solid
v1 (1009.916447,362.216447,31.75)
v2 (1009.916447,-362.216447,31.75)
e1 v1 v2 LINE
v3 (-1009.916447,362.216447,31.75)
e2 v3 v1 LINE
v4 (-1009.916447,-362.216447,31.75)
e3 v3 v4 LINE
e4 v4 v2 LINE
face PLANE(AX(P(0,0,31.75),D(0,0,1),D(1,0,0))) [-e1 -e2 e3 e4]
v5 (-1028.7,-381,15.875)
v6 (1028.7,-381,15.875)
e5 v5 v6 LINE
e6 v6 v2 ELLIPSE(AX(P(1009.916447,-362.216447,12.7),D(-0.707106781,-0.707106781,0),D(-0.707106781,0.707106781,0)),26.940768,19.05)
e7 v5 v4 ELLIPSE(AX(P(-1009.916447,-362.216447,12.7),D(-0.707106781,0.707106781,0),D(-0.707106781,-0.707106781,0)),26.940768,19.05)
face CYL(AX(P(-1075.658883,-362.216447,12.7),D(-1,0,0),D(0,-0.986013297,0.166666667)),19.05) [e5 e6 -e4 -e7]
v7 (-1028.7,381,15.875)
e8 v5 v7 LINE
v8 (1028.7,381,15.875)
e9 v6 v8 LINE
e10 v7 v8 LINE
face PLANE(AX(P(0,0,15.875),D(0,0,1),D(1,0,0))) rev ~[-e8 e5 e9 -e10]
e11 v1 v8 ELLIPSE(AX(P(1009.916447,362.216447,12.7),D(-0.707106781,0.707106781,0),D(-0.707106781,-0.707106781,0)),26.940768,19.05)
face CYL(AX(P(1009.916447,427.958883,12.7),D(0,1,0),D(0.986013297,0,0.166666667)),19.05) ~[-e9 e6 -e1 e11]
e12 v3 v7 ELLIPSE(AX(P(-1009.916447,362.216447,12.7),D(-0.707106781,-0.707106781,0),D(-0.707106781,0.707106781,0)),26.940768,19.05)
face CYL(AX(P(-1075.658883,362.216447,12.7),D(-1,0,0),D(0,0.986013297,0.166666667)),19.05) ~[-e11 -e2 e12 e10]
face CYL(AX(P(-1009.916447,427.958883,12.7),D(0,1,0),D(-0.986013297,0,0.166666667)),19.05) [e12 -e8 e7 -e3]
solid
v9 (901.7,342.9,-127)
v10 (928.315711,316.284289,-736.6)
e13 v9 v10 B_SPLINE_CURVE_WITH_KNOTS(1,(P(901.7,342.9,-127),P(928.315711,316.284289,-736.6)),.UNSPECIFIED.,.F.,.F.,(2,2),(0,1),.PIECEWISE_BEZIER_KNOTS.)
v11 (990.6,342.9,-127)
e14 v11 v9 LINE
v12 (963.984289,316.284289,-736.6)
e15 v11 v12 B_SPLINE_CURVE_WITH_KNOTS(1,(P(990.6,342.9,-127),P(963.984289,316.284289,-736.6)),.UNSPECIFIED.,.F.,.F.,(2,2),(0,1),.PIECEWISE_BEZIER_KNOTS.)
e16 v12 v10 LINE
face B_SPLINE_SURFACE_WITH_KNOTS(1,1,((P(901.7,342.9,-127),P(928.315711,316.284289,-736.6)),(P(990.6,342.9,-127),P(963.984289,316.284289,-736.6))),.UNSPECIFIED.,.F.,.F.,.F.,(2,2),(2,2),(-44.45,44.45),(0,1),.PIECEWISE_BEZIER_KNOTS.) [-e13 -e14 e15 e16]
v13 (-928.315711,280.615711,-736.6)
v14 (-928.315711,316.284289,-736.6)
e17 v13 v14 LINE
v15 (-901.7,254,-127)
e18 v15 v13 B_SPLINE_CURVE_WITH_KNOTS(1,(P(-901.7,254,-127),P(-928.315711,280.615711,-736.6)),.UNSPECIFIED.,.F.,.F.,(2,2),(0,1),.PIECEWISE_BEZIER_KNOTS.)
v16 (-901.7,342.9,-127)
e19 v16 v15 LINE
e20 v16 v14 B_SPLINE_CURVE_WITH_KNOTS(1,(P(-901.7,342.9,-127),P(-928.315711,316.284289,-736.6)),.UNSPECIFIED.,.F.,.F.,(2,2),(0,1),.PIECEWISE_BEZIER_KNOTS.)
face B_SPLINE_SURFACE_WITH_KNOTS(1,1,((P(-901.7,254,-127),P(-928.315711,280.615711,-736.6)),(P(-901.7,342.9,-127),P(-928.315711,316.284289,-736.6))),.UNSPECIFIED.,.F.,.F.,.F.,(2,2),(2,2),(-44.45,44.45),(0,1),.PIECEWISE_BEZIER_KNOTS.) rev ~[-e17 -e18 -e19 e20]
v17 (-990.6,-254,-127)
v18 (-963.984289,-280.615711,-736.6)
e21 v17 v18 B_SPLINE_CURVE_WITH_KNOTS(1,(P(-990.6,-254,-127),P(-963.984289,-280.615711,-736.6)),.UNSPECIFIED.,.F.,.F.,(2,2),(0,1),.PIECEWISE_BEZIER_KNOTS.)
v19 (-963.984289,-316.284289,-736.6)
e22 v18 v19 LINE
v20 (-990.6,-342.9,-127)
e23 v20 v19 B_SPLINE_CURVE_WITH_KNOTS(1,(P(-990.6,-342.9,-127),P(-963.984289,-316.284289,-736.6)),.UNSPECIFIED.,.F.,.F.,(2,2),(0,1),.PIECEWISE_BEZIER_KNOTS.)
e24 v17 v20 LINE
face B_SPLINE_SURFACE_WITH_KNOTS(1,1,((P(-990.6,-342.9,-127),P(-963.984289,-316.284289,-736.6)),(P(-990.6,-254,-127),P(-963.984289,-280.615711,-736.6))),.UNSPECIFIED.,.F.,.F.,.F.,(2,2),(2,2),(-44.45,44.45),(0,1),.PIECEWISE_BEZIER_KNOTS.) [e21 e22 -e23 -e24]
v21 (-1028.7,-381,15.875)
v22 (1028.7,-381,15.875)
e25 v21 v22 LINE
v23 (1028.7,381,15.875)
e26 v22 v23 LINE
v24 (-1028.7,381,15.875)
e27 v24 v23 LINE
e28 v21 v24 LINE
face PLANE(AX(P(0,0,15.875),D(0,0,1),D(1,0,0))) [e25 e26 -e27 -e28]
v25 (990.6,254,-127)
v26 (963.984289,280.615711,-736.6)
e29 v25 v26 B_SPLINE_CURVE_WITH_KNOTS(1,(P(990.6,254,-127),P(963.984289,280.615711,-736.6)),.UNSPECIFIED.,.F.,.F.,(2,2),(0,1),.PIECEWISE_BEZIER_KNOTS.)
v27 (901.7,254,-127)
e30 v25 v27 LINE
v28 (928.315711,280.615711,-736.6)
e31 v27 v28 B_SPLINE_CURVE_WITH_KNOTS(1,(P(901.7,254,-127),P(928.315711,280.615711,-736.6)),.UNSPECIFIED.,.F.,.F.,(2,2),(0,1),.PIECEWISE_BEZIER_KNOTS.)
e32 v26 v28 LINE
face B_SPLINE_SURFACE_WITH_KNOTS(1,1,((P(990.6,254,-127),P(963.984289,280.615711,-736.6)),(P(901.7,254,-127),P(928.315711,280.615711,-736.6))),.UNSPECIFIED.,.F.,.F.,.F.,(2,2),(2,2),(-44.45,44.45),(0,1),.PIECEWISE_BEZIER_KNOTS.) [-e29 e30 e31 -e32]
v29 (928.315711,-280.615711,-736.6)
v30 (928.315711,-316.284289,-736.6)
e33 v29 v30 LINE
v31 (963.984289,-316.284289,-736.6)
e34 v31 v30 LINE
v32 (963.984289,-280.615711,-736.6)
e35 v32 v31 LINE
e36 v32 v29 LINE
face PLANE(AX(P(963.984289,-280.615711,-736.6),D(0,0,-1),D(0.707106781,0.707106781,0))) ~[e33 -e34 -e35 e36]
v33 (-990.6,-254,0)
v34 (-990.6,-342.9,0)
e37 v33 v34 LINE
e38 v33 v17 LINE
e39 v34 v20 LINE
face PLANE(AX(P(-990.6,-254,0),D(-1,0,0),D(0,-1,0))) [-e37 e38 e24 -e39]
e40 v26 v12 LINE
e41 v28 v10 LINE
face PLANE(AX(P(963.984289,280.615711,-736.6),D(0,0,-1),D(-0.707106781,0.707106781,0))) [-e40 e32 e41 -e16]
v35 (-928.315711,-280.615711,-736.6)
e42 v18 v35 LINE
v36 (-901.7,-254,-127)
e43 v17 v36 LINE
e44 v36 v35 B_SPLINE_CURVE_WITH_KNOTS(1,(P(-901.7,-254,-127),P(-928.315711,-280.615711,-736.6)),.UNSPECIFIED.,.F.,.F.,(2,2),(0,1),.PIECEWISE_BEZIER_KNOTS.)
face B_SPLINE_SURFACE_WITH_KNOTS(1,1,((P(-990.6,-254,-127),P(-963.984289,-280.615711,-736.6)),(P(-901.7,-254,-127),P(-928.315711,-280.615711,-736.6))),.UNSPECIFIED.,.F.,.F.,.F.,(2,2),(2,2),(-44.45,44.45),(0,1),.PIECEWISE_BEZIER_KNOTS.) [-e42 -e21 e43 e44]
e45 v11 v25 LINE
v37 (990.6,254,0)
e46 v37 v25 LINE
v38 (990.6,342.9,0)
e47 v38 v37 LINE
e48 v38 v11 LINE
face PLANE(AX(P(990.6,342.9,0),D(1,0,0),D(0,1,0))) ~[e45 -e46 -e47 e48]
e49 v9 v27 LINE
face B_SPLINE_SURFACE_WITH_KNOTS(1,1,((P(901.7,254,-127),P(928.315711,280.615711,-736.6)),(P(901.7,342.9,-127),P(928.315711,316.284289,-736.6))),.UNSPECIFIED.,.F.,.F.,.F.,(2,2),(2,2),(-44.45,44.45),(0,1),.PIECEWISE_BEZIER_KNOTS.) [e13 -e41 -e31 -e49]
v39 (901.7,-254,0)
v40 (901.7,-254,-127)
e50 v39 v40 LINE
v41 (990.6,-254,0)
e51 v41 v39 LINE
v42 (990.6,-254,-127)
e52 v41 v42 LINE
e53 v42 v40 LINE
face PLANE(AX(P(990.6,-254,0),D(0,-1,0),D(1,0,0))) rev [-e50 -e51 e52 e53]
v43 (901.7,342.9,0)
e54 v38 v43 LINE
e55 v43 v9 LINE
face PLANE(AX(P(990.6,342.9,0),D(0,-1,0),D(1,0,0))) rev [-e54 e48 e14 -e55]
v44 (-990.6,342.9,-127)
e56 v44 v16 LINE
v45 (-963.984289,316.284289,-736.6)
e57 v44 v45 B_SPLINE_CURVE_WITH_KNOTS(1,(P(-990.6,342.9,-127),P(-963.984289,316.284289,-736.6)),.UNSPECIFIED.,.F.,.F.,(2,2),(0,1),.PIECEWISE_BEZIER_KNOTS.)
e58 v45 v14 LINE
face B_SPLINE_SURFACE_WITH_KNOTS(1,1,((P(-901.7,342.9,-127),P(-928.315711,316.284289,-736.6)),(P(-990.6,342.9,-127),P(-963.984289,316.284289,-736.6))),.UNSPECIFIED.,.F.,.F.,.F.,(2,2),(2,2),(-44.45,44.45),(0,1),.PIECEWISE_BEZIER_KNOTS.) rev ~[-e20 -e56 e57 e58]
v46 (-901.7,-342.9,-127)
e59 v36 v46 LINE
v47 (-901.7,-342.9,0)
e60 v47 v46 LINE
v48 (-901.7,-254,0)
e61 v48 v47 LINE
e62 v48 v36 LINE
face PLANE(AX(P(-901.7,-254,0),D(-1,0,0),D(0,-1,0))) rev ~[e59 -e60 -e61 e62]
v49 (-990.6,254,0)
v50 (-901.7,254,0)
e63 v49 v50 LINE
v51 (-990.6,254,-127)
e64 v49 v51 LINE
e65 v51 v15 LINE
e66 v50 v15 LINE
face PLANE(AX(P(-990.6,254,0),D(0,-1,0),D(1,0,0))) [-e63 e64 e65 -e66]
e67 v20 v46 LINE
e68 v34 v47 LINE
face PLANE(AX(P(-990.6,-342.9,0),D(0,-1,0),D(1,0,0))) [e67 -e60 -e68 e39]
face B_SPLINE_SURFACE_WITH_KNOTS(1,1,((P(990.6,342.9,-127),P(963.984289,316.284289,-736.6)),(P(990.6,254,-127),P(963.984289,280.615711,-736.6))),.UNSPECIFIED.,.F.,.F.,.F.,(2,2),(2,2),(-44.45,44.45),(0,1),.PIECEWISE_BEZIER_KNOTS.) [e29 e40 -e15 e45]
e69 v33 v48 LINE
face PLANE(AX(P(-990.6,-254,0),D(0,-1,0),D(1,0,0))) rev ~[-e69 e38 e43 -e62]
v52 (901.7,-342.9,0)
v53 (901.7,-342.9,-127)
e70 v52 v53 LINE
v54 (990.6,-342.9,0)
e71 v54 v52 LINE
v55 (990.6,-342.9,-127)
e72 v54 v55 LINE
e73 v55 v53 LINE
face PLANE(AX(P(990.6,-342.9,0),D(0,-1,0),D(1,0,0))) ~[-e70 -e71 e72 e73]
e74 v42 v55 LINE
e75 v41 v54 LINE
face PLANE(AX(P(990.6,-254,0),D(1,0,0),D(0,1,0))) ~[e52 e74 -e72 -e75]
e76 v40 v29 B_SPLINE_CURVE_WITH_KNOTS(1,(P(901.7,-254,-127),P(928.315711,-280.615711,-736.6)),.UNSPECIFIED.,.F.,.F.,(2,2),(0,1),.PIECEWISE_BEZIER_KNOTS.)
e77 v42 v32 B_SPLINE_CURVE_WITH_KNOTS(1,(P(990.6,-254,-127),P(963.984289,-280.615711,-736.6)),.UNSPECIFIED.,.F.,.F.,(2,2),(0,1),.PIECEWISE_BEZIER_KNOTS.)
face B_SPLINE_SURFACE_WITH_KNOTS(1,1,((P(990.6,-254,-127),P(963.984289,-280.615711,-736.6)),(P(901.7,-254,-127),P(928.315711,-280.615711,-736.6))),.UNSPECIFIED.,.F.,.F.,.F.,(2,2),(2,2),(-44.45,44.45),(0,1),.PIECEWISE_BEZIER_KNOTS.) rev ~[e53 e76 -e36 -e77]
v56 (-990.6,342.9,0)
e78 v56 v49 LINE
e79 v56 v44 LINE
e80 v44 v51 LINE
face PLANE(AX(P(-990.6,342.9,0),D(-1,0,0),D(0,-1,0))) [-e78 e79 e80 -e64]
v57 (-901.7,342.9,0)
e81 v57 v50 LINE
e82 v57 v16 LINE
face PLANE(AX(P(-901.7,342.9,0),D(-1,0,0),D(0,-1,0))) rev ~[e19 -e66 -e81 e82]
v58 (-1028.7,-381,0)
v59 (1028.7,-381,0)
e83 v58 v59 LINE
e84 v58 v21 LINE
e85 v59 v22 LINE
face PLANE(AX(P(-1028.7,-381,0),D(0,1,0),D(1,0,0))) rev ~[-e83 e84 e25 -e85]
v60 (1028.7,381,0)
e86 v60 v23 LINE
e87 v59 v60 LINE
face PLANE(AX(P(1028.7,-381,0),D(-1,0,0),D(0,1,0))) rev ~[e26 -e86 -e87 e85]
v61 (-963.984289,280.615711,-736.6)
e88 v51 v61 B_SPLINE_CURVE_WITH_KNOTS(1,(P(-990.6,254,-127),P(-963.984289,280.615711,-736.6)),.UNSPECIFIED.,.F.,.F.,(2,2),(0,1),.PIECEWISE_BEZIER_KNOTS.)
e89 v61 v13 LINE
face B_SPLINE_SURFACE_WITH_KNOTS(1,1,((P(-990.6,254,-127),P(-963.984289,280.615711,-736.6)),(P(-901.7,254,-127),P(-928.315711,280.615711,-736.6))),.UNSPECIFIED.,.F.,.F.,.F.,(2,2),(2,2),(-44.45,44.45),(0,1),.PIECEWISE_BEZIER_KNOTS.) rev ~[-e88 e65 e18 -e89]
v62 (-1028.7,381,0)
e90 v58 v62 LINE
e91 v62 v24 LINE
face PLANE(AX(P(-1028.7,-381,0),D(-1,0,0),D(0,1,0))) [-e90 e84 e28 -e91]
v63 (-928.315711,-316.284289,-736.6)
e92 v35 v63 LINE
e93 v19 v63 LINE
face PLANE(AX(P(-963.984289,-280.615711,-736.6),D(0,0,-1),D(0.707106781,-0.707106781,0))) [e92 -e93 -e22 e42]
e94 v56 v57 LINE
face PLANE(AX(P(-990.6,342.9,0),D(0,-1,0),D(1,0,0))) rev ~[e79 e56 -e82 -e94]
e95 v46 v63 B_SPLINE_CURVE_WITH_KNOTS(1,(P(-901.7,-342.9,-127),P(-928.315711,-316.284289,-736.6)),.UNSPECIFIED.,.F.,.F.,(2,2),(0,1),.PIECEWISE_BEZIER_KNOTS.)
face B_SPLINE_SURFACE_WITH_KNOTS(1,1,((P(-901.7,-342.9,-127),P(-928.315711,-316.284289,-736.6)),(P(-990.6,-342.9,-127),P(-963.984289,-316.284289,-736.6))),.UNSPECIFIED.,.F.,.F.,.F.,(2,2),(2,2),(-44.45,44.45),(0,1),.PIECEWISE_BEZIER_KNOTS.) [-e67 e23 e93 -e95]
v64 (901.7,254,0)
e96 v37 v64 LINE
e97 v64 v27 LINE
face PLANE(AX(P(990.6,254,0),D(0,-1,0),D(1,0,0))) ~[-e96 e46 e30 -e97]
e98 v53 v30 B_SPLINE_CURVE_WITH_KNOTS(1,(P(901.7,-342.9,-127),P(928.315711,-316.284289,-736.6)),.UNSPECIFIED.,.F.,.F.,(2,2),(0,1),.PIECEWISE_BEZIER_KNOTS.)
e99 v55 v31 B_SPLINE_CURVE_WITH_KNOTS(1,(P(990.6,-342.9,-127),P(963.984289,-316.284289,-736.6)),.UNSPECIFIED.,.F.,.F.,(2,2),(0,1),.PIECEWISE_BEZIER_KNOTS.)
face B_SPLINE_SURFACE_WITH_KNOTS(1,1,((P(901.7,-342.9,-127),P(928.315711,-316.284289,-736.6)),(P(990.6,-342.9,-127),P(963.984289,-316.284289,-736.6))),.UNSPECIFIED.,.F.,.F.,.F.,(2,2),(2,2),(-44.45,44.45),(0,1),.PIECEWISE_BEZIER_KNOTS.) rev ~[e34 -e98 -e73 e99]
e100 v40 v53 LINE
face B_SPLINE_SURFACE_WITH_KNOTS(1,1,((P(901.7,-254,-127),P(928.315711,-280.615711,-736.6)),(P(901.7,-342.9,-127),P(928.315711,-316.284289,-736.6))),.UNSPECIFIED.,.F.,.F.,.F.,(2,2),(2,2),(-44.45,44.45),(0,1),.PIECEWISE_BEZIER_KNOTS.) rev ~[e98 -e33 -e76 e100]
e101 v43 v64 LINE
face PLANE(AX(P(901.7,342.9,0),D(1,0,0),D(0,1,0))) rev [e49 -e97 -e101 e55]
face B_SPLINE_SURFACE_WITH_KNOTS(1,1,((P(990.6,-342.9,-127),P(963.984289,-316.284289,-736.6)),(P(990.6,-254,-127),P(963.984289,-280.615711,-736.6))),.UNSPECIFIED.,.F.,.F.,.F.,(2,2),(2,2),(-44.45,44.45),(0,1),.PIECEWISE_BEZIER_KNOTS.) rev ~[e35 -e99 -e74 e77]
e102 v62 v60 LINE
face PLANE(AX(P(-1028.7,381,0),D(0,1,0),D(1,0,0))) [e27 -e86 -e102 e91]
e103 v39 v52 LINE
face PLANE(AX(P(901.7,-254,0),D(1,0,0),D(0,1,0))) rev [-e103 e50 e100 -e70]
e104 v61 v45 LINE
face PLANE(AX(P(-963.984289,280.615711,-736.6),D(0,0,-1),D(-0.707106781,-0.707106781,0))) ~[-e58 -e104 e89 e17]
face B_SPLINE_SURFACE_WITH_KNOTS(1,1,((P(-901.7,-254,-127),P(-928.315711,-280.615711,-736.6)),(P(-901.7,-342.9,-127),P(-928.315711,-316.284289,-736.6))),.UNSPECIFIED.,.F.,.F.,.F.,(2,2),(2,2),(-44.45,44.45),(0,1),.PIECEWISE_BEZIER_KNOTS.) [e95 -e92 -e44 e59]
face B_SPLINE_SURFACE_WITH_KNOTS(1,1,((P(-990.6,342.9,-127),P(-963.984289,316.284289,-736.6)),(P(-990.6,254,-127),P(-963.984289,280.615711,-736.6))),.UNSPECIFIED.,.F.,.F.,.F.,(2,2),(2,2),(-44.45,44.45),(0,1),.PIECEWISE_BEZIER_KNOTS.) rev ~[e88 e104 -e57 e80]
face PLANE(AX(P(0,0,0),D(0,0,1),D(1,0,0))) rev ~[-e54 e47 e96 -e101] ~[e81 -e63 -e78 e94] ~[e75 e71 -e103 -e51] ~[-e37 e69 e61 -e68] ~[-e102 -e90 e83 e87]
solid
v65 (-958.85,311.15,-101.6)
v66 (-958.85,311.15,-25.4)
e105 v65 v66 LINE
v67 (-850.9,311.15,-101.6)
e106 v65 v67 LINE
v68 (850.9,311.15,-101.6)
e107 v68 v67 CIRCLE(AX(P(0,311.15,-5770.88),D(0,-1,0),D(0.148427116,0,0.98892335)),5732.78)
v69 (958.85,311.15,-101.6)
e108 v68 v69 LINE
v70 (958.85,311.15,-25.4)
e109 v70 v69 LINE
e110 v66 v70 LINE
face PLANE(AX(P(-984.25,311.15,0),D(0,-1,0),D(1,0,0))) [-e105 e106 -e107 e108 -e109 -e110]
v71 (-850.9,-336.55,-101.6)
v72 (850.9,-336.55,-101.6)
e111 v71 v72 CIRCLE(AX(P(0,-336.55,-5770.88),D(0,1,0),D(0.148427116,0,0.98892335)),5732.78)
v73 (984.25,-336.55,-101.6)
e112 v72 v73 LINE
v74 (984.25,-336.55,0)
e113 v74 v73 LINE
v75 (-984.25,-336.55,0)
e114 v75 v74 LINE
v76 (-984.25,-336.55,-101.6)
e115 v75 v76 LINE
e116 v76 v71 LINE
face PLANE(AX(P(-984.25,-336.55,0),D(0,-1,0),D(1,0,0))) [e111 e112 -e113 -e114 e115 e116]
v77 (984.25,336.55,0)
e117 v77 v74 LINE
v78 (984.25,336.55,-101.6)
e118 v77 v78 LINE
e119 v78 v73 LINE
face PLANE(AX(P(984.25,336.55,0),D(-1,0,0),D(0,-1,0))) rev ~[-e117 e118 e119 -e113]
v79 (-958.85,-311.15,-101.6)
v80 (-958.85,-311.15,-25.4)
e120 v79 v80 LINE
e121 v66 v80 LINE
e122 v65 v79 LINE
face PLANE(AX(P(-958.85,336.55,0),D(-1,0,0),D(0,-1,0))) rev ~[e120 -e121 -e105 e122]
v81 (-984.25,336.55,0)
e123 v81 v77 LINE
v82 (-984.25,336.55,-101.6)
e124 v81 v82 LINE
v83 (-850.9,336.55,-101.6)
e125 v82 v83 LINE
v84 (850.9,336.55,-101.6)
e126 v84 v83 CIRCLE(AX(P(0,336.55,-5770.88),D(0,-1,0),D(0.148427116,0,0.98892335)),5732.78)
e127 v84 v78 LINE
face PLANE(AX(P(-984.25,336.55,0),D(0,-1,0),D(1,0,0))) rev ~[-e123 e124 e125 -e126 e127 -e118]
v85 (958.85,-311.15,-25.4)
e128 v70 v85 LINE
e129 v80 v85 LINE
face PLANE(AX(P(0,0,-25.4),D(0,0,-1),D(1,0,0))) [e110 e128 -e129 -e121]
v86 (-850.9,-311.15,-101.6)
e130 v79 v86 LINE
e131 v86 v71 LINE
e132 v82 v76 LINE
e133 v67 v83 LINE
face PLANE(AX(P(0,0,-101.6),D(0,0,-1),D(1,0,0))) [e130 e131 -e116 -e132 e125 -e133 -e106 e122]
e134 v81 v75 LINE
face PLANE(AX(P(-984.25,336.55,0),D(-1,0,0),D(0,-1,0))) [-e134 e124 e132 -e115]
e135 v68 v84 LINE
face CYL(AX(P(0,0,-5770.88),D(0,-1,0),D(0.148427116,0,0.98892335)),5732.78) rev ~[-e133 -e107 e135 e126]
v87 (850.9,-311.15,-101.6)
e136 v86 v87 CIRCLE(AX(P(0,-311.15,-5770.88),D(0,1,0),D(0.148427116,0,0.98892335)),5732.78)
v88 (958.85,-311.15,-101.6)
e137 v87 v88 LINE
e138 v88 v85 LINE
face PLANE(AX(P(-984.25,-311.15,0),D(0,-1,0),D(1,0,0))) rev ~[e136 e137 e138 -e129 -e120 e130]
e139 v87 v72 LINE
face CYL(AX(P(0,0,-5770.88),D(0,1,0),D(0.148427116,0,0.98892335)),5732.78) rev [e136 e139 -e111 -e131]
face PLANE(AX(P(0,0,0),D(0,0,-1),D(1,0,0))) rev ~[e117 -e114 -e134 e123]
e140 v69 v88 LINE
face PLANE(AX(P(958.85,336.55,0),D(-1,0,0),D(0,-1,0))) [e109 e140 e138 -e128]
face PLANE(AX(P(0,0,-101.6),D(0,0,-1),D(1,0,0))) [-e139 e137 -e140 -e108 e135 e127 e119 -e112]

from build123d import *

# Parameters (mm, degrees)
F0_W           = 2057.4
F0_H           = 762
F1_DEPTH       = 15.875
F2_W           = 2057.4
F2_H           = 762
F3_DEPTH       = 15.875
F4_T1_DEPTH    = 2151.3177665567
F4_T3_DEPTH    = 855.9177665567
F6_W           = 88.9
F6_H           = 88.9
F7_DEPTH       = 127
F9_W           = 1968.5
F9_H           = 673.1
F10_DEPTH      = 101.6
F11_T          = -25.4
F12_W          = 88.9
F12_H          = 88.9
F13_DEPTH      = 609.6
F13_TAPER      = 2.5
F16_W          = 1701.8
F16_H          = 245.2263149261
F17_DEPTH      = 914.4
F17_DEPTH_BACK = 914.4


# Not quite as in the source:
# - a fillet or chamfer that OpenCascade refuses, or shapes differently, is made with other operations: its cross-section is extruded or revolved along the edge and cut away or added


with BuildPart() as f1:
    # F0 (on Top) → F1 (new body)
    with BuildSketch(Plane.XY):
        Rectangle(F0_W, F0_H)
    extrude(amount=F1_DEPTH)

    # F6 (on face) → F7 (join)
    with BuildSketch(Plane(origin=(0, 0, 0), x_dir=(1, 0, 0), z_dir=(0, 0, -1))):
        with Locations((-946.15, 298.45)):
            Rectangle(F6_W, F6_H)
        with Locations((-946.15, -298.45)):
            Rectangle(F6_W, F6_H)
    extrude(amount=F7_DEPTH)

    # F8: F1 across plane


with BuildPart() as f3:
    # F2 (on face) → F3 (new body)
    with BuildSketch(Plane.XY.offset(15.875)):
        Rectangle(F2_W, F2_H)
    extrude(amount=F3_DEPTH)

    # F4: fillet of radius 19.05 on 4 edges, made by hand

    # F4_s2 → F4_t1 (cut)
    with BuildSketch(Plane.YZ.offset(-1075.6588832784)):
        with BuildLine():
            ThreePointArc((-381, 15.875), (-374.5131688129, 27.2496778315), (-362.2164466887, 31.75))
            Line((-362.2164466887, 31.75), (-381, 31.75))
            Line((-381, 31.75), (-381, 15.875))
        make_face()
        with BuildLine():
            ThreePointArc((381, 15.875), (374.5131688129, 27.2496778315), (362.2164466887, 31.75))
            Line((362.2164466887, 31.75), (381, 31.75))
            Line((381, 31.75), (381, 15.875))
        make_face()
    extrude(amount=F4_T1_DEPTH, mode=Mode.SUBTRACT)

    # F4_s4 → F4_t3 (cut)
    with BuildSketch(Plane.XZ.offset(-427.9588832784)):
        with BuildLine():
            ThreePointArc((-1028.7, 15.875), (-1022.2131688129, 27.2496778315), (-1009.9164466887, 31.75))
            Line((-1009.9164466887, 31.75), (-1028.7, 31.75))
            Line((-1028.7, 31.75), (-1028.7, 15.875))
        make_face()
        with BuildLine():
            ThreePointArc((1028.7, 15.875), (1022.2131688129, 27.2496778315), (1009.9164466887, 31.75))
            Line((1009.9164466887, 31.75), (1028.7, 31.75))
            Line((1028.7, 31.75), (1028.7, 15.875))
        make_face()
    extrude(amount=F4_T3_DEPTH, mode=Mode.SUBTRACT)


with BuildPart() as f1_1:
    add(f1.part)
    add(f1.part.mirror(Plane.YZ))

    # F12 (on face) → F13 (join)
    with BuildSketch(Plane(origin=(0, 0, -127), x_dir=(1, 0, 0), z_dir=(0, 0, -1))):
        with Locations((-946.15, 298.45)):
            Rectangle(F12_W, F12_H)
    extrude(amount=F13_DEPTH, taper=F13_TAPER)


with BuildPart() as f10:
    # F9 (on face) → F10 (new body)
    with BuildSketch(Plane(origin=(0, 0, 0), x_dir=(1, 0, 0), z_dir=(0, 0, -1))):
        Rectangle(F9_W, F9_H)
    extrude(amount=F10_DEPTH)

    # F11
    f11_openings = [f10.faces().sort_by_distance(p)[0] for p in [
        (0, 0, -101.6),
    ]]
    offset(amount=F11_T, openings=f11_openings)

    # F16 (on Front) → F17 (cut, two sides)
    with BuildSketch(Plane.XZ) as f17_sk:
        with BuildLine():
            Line((-850.9, -101.6), (850.9, -101.6))
            ThreePointArc((850.9, -101.6), (0, -38.1), (-850.9, -101.6))
        make_face()
        with Locations((0, -224.2131574631)):
            Rectangle(F16_W, F16_H)
    extrude(amount=F17_DEPTH, mode=Mode.SUBTRACT)
    extrude(f17_sk.sketch, amount=-F17_DEPTH_BACK, mode=Mode.SUBTRACT)


with BuildPart() as f14_1:
    # F14: instance of F1
    add(f1_1.part.mirror(Plane.XZ))


with BuildPart() as f1_2:
    add(f1_1.part)

    add(f14_1.part)  # F15 merges F14_1
    # F15: F1, F14_1 across plane
    add(f1_1.part.mirror(Plane.YZ))
    add(f14_1.part.mirror(Plane.YZ))


solid = Compound([f3.part, f10.part, f1_2.part])
